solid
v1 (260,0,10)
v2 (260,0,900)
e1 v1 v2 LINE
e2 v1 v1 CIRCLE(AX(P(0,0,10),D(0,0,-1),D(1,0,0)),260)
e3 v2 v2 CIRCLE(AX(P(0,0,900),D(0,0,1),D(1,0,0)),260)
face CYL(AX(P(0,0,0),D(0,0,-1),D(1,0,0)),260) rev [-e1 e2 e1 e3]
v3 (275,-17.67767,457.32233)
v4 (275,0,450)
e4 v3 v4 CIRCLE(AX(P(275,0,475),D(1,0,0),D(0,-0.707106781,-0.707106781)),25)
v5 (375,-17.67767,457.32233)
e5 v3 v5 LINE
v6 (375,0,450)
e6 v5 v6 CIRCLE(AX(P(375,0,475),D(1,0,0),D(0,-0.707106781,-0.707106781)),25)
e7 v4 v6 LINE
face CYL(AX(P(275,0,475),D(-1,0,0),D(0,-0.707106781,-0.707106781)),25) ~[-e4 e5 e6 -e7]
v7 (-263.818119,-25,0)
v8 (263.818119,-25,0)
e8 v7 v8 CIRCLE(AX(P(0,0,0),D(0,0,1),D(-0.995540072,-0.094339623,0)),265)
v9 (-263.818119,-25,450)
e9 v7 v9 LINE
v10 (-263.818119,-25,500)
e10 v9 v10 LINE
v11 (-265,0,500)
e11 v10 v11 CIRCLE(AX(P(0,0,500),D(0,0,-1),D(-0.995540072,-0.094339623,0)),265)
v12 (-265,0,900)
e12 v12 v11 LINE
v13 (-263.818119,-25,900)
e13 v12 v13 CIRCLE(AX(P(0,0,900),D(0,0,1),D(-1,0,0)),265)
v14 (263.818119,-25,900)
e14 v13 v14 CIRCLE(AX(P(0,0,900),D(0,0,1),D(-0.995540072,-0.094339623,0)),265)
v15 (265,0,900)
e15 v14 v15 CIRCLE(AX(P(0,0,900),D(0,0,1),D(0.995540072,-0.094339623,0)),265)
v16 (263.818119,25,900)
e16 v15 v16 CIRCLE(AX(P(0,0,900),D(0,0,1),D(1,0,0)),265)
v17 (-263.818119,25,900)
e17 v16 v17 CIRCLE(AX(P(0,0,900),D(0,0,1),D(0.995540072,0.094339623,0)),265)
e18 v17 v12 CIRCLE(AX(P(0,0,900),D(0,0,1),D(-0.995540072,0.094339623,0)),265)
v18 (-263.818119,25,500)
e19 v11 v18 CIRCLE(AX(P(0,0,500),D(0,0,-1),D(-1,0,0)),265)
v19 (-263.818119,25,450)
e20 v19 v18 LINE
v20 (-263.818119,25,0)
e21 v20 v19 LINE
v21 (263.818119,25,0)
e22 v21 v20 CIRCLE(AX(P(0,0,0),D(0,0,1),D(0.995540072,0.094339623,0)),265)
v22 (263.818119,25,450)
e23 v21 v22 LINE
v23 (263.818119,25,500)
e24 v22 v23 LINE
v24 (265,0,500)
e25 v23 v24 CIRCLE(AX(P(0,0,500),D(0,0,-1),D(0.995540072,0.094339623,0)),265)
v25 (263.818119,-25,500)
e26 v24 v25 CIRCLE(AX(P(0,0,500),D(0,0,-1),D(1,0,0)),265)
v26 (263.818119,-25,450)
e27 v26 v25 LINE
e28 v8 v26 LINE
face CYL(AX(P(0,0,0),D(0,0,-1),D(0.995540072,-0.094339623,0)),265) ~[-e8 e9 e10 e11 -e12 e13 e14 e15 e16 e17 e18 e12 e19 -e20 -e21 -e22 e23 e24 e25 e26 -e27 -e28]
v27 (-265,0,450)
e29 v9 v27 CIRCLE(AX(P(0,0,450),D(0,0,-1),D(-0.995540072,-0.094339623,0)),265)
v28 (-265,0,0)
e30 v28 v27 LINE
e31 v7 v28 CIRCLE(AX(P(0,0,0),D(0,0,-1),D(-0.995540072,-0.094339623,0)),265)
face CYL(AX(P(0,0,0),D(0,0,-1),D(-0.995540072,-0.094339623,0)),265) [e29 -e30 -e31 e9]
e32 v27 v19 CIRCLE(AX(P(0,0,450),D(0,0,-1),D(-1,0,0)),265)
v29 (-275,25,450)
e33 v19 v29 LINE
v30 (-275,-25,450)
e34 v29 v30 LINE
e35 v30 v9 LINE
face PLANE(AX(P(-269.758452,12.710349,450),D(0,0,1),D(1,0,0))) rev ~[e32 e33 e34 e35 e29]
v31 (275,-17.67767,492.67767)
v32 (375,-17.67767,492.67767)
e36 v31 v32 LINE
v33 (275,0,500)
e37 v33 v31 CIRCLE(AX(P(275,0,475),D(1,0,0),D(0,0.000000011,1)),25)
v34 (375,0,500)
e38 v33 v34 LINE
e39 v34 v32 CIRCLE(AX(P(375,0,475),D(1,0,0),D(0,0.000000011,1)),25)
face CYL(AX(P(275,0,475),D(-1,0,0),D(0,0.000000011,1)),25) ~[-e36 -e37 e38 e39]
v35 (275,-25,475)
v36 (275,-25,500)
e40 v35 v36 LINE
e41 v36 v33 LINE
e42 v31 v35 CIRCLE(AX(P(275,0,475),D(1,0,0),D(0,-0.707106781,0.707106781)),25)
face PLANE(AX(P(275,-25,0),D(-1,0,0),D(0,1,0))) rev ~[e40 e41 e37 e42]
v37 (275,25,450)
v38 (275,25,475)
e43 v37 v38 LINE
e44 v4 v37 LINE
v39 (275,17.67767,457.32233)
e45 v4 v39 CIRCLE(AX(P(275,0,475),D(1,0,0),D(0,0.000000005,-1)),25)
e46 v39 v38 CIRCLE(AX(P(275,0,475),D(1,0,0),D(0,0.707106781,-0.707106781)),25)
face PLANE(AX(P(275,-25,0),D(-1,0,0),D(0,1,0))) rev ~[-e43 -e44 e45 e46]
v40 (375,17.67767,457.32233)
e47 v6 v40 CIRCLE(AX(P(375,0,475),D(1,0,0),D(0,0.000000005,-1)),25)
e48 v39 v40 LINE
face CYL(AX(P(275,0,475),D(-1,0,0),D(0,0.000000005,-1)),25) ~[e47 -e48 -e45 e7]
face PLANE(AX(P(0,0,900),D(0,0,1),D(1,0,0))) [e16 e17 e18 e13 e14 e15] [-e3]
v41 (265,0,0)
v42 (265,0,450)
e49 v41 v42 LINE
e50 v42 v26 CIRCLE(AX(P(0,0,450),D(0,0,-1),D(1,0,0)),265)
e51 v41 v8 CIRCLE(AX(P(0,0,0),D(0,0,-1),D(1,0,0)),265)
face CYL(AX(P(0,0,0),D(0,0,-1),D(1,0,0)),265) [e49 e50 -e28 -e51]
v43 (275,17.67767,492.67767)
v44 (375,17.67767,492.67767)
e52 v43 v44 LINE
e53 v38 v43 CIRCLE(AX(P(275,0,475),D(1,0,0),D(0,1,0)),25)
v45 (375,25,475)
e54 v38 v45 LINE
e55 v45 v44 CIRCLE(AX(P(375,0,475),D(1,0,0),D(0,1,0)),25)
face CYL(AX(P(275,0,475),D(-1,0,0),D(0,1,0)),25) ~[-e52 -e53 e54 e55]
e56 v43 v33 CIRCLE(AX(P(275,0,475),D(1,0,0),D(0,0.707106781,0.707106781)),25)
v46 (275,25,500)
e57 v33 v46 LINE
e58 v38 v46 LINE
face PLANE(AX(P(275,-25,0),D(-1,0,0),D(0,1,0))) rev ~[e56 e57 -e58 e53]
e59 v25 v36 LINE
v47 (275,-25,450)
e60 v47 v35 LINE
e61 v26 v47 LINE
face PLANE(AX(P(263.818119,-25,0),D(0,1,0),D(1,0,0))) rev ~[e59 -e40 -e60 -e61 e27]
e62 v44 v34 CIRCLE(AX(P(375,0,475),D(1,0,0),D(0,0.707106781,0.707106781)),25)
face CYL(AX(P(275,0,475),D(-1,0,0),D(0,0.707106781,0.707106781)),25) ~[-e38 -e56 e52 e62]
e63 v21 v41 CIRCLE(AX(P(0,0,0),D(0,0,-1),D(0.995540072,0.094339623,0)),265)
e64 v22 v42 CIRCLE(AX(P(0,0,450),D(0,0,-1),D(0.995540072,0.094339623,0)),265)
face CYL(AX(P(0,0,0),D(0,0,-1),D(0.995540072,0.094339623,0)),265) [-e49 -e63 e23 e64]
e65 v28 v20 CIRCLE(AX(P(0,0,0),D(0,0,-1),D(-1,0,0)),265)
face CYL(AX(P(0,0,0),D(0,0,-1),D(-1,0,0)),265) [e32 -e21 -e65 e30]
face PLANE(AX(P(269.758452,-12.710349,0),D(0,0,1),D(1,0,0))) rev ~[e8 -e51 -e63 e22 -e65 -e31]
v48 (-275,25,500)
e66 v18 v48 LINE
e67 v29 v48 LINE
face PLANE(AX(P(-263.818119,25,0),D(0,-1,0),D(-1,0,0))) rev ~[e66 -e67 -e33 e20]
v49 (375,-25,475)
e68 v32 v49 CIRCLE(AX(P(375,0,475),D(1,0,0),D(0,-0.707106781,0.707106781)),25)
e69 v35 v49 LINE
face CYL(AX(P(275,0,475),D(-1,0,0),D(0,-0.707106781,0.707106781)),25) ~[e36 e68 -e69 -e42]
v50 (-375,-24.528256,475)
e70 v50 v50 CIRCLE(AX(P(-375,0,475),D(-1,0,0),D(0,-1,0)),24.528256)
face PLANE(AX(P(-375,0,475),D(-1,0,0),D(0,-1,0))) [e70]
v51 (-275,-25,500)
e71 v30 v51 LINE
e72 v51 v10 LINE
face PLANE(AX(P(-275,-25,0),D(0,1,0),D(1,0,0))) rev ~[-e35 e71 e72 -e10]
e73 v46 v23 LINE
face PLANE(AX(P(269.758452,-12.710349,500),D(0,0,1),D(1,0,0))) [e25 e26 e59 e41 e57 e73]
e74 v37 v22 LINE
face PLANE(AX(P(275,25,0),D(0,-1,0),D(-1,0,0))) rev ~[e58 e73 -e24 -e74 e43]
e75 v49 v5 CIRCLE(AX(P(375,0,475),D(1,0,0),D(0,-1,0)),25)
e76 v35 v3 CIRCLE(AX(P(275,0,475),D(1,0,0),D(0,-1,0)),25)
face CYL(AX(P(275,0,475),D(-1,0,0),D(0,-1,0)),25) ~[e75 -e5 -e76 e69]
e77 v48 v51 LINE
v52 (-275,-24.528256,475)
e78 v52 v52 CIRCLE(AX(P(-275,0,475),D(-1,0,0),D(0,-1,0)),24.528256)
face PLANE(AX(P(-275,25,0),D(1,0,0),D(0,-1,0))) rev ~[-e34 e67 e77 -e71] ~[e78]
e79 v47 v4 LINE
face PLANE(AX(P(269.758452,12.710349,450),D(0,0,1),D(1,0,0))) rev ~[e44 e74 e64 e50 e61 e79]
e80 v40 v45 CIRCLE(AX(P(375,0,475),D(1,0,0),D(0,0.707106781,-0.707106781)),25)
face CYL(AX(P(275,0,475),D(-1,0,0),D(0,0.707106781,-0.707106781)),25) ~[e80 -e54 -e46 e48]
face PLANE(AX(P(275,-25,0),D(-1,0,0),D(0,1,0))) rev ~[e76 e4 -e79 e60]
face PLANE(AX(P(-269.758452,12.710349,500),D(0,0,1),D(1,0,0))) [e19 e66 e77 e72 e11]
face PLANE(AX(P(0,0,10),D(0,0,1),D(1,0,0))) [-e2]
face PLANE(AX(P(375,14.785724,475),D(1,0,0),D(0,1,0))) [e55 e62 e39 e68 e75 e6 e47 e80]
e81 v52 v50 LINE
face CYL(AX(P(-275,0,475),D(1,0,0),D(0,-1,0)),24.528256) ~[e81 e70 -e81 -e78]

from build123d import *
from build123d import SkipClean  # not in build123d's __all__

# Parameters (mm, degrees)
F0_R     = 260
F1_DEPTH = 10
F2_DEPTH = 900
F3_DEPTH = 500
F4_DEPTH = 450
F5_R     = 24.5282559267
F6_DEPTH = 100
F8_DEPTH = 100


# Not quite as in the source:
# - after a boolean that leaves OpenCascade's solid faulty, fix() repairs it


with BuildPart() as f1:
    # F0 (on Top) → F1 (new body)
    with BuildSketch(Plane.XY):
        with BuildLine():
            ThreePointArc((263.8181191655, -25), (264.7043648855, -12.5139606271), (265, 0))
            ThreePointArc((265, 0), (264.7043648855, 12.5139606271), (263.8181191655, 25))
            ThreePointArc((263.8181191655, 25), (0, 265), (-263.8181191655, 25))
            ThreePointArc((-263.8181191655, 25), (-264.7043648855, 12.5139606271), (-265, 0))
            ThreePointArc((-265, 0), (-264.7043648855, -12.5139606271), (-263.8181191655, -25))
            ThreePointArc((-263.8181191655, -25), (0, -265), (263.8181191655, -25))
        make_face()
        Circle(F0_R, mode=Mode.SUBTRACT)
        Circle(F0_R)
    extrude(amount=F1_DEPTH)

    # F0 (on Top) → F2 (join)
    with BuildSketch(Plane.XY):
        with BuildLine():
            ThreePointArc((263.8181191655, -25), (264.7043648855, -12.5139606271), (265, 0))
            ThreePointArc((265, 0), (264.7043648855, 12.5139606271), (263.8181191655, 25))
            ThreePointArc((263.8181191655, 25), (0, 265), (-263.8181191655, 25))
            ThreePointArc((-263.8181191655, 25), (-264.7043648855, 12.5139606271), (-265, 0))
            ThreePointArc((-265, 0), (-264.7043648855, -12.5139606271), (-263.8181191655, -25))
            ThreePointArc((-263.8181191655, -25), (0, -265), (263.8181191655, -25))
        make_face()
        Circle(F0_R, mode=Mode.SUBTRACT)
    extrude(amount=F2_DEPTH)

    # F0 (on Top) → F3 (join)
    with BuildSketch(Plane.XY):
        with BuildLine():
            Line((275, 0), (265, 0))
            ThreePointArc((265, 0), (264.7043648855, -12.5139606271), (263.8181191655, -25))
            Line((263.8181191655, -25), (275, -25))
            Line((275, -25), (275, 0))
        make_face()
        with BuildLine():
            ThreePointArc((263.8181191655, 25), (264.7043648855, 12.5139606271), (265, 0))
            Line((265, 0), (275, 0))
            Line((275, 0), (275, 25))
            Line((275, 25), (263.8181191655, 25))
        make_face()
        with BuildLine():
            ThreePointArc((-265, 0), (-264.7043648855, 12.5139606271), (-263.8181191655, 25))
            Line((-263.8181191655, 25), (-275, 25))
            Line((-275, 25), (-275, 0))
            Line((-275, 0), (-265, 0))
        make_face()
        with BuildLine():
            Line((-275, -25), (-263.8181191655, -25))
            ThreePointArc((-263.8181191655, -25), (-264.7043648855, -12.5139606271), (-265, 0))
            Line((-265, 0), (-275, 0))
            Line((-275, 0), (-275, -25))
        make_face()
    extrude(amount=F3_DEPTH)

    # F0 (on Top) → F4 (cut)
    with BuildSketch(Plane.XY):
        with BuildLine():
            ThreePointArc((263.8181191655, 25), (264.7043648855, 12.5139606271), (265, 0))
            Line((265, 0), (275, 0))
            Line((275, 0), (275, 25))
            Line((275, 25), (263.8181191655, 25))
        make_face()
        with BuildLine():
            Line((275, 0), (265, 0))
            ThreePointArc((265, 0), (264.7043648855, -12.5139606271), (263.8181191655, -25))
            Line((263.8181191655, -25), (275, -25))
            Line((275, -25), (275, 0))
        make_face()
        with BuildLine():
            ThreePointArc((-265, 0), (-264.7043648855, 12.5139606271), (-263.8181191655, 25))
            Line((-263.8181191655, 25), (-275, 25))
            Line((-275, 25), (-275, 0))
            Line((-275, 0), (-265, 0))
        make_face()
        with BuildLine():
            Line((-275, -25), (-263.8181191655, -25))
            ThreePointArc((-263.8181191655, -25), (-264.7043648855, -12.5139606271), (-265, 0))
            Line((-265, 0), (-275, 0))
            Line((-275, 0), (-275, -25))
        make_face()
    with SkipClean():  # cleaning this boolean's faces spoils the solid; the shape is the same uncleaned
        extrude(amount=F4_DEPTH, mode=Mode.SUBTRACT)

    # F5 (on face) → F6 (join)
    with BuildSketch(Plane(origin=(-275, 0, 0), x_dir=(0, -1, 0), z_dir=(-1, 0, 0))):
        with Locations((0, 475)):
            Circle(F5_R)
    extrude(amount=F6_DEPTH)

    add(f1.part.fix(), mode=Mode.REPLACE)

    # F7 (on face) → F8 (join)
    with BuildSketch(Plane.YZ.offset(275)):
        with BuildLine():
            Line((17.6776695297, 492.6776695297), (0, 475))
            Line((0, 475), (17.6776695297, 457.3223304703))
            ThreePointArc((17.6776695297, 457.3223304703), (23.0969883128, 465.4329141909), (25, 475))
            ThreePointArc((25, 475), (23.0969883128, 484.5670858091), (17.6776695297, 492.6776695297))
        make_face()
        with BuildLine():
            ThreePointArc((2.731e-07, 500), (-9.567085683, 498.096988365), (-17.6776695297, 492.6776695297))
            Line((-17.6776695297, 492.6776695297), (0, 475))
            Line((0, 475), (17.6776695297, 492.6776695297))
            ThreePointArc((17.6776695297, 492.6776695297), (9.5670859353, 498.0969882605), (2.731e-07, 500))
        make_face()
        with BuildLine():
            Line((0, 475), (-17.6776695297, 492.6776695297))
            ThreePointArc((-17.6776695297, 492.6776695297), (-23.0969883128, 484.5670858091), (-25, 475))
            ThreePointArc((-25, 475), (-23.0969883128, 465.4329141909), (-17.6776695297, 457.3223304703))
            Line((-17.6776695297, 457.3223304703), (0, 475))
        make_face()
        with BuildLine():
            Line((17.6776695297, 457.3223304703), (0, 475))
            Line((0, 475), (-17.6776695297, 457.3223304703))
            ThreePointArc((-17.6776695297, 457.3223304703), (-9.5670857461, 451.9030116611), (1.365e-07, 450))
            ThreePointArc((1.365e-07, 450), (9.5670858722, 451.9030117133), (17.6776695297, 457.3223304703))
        make_face()
    extrude(amount=F8_DEPTH)


solid = f1.part
